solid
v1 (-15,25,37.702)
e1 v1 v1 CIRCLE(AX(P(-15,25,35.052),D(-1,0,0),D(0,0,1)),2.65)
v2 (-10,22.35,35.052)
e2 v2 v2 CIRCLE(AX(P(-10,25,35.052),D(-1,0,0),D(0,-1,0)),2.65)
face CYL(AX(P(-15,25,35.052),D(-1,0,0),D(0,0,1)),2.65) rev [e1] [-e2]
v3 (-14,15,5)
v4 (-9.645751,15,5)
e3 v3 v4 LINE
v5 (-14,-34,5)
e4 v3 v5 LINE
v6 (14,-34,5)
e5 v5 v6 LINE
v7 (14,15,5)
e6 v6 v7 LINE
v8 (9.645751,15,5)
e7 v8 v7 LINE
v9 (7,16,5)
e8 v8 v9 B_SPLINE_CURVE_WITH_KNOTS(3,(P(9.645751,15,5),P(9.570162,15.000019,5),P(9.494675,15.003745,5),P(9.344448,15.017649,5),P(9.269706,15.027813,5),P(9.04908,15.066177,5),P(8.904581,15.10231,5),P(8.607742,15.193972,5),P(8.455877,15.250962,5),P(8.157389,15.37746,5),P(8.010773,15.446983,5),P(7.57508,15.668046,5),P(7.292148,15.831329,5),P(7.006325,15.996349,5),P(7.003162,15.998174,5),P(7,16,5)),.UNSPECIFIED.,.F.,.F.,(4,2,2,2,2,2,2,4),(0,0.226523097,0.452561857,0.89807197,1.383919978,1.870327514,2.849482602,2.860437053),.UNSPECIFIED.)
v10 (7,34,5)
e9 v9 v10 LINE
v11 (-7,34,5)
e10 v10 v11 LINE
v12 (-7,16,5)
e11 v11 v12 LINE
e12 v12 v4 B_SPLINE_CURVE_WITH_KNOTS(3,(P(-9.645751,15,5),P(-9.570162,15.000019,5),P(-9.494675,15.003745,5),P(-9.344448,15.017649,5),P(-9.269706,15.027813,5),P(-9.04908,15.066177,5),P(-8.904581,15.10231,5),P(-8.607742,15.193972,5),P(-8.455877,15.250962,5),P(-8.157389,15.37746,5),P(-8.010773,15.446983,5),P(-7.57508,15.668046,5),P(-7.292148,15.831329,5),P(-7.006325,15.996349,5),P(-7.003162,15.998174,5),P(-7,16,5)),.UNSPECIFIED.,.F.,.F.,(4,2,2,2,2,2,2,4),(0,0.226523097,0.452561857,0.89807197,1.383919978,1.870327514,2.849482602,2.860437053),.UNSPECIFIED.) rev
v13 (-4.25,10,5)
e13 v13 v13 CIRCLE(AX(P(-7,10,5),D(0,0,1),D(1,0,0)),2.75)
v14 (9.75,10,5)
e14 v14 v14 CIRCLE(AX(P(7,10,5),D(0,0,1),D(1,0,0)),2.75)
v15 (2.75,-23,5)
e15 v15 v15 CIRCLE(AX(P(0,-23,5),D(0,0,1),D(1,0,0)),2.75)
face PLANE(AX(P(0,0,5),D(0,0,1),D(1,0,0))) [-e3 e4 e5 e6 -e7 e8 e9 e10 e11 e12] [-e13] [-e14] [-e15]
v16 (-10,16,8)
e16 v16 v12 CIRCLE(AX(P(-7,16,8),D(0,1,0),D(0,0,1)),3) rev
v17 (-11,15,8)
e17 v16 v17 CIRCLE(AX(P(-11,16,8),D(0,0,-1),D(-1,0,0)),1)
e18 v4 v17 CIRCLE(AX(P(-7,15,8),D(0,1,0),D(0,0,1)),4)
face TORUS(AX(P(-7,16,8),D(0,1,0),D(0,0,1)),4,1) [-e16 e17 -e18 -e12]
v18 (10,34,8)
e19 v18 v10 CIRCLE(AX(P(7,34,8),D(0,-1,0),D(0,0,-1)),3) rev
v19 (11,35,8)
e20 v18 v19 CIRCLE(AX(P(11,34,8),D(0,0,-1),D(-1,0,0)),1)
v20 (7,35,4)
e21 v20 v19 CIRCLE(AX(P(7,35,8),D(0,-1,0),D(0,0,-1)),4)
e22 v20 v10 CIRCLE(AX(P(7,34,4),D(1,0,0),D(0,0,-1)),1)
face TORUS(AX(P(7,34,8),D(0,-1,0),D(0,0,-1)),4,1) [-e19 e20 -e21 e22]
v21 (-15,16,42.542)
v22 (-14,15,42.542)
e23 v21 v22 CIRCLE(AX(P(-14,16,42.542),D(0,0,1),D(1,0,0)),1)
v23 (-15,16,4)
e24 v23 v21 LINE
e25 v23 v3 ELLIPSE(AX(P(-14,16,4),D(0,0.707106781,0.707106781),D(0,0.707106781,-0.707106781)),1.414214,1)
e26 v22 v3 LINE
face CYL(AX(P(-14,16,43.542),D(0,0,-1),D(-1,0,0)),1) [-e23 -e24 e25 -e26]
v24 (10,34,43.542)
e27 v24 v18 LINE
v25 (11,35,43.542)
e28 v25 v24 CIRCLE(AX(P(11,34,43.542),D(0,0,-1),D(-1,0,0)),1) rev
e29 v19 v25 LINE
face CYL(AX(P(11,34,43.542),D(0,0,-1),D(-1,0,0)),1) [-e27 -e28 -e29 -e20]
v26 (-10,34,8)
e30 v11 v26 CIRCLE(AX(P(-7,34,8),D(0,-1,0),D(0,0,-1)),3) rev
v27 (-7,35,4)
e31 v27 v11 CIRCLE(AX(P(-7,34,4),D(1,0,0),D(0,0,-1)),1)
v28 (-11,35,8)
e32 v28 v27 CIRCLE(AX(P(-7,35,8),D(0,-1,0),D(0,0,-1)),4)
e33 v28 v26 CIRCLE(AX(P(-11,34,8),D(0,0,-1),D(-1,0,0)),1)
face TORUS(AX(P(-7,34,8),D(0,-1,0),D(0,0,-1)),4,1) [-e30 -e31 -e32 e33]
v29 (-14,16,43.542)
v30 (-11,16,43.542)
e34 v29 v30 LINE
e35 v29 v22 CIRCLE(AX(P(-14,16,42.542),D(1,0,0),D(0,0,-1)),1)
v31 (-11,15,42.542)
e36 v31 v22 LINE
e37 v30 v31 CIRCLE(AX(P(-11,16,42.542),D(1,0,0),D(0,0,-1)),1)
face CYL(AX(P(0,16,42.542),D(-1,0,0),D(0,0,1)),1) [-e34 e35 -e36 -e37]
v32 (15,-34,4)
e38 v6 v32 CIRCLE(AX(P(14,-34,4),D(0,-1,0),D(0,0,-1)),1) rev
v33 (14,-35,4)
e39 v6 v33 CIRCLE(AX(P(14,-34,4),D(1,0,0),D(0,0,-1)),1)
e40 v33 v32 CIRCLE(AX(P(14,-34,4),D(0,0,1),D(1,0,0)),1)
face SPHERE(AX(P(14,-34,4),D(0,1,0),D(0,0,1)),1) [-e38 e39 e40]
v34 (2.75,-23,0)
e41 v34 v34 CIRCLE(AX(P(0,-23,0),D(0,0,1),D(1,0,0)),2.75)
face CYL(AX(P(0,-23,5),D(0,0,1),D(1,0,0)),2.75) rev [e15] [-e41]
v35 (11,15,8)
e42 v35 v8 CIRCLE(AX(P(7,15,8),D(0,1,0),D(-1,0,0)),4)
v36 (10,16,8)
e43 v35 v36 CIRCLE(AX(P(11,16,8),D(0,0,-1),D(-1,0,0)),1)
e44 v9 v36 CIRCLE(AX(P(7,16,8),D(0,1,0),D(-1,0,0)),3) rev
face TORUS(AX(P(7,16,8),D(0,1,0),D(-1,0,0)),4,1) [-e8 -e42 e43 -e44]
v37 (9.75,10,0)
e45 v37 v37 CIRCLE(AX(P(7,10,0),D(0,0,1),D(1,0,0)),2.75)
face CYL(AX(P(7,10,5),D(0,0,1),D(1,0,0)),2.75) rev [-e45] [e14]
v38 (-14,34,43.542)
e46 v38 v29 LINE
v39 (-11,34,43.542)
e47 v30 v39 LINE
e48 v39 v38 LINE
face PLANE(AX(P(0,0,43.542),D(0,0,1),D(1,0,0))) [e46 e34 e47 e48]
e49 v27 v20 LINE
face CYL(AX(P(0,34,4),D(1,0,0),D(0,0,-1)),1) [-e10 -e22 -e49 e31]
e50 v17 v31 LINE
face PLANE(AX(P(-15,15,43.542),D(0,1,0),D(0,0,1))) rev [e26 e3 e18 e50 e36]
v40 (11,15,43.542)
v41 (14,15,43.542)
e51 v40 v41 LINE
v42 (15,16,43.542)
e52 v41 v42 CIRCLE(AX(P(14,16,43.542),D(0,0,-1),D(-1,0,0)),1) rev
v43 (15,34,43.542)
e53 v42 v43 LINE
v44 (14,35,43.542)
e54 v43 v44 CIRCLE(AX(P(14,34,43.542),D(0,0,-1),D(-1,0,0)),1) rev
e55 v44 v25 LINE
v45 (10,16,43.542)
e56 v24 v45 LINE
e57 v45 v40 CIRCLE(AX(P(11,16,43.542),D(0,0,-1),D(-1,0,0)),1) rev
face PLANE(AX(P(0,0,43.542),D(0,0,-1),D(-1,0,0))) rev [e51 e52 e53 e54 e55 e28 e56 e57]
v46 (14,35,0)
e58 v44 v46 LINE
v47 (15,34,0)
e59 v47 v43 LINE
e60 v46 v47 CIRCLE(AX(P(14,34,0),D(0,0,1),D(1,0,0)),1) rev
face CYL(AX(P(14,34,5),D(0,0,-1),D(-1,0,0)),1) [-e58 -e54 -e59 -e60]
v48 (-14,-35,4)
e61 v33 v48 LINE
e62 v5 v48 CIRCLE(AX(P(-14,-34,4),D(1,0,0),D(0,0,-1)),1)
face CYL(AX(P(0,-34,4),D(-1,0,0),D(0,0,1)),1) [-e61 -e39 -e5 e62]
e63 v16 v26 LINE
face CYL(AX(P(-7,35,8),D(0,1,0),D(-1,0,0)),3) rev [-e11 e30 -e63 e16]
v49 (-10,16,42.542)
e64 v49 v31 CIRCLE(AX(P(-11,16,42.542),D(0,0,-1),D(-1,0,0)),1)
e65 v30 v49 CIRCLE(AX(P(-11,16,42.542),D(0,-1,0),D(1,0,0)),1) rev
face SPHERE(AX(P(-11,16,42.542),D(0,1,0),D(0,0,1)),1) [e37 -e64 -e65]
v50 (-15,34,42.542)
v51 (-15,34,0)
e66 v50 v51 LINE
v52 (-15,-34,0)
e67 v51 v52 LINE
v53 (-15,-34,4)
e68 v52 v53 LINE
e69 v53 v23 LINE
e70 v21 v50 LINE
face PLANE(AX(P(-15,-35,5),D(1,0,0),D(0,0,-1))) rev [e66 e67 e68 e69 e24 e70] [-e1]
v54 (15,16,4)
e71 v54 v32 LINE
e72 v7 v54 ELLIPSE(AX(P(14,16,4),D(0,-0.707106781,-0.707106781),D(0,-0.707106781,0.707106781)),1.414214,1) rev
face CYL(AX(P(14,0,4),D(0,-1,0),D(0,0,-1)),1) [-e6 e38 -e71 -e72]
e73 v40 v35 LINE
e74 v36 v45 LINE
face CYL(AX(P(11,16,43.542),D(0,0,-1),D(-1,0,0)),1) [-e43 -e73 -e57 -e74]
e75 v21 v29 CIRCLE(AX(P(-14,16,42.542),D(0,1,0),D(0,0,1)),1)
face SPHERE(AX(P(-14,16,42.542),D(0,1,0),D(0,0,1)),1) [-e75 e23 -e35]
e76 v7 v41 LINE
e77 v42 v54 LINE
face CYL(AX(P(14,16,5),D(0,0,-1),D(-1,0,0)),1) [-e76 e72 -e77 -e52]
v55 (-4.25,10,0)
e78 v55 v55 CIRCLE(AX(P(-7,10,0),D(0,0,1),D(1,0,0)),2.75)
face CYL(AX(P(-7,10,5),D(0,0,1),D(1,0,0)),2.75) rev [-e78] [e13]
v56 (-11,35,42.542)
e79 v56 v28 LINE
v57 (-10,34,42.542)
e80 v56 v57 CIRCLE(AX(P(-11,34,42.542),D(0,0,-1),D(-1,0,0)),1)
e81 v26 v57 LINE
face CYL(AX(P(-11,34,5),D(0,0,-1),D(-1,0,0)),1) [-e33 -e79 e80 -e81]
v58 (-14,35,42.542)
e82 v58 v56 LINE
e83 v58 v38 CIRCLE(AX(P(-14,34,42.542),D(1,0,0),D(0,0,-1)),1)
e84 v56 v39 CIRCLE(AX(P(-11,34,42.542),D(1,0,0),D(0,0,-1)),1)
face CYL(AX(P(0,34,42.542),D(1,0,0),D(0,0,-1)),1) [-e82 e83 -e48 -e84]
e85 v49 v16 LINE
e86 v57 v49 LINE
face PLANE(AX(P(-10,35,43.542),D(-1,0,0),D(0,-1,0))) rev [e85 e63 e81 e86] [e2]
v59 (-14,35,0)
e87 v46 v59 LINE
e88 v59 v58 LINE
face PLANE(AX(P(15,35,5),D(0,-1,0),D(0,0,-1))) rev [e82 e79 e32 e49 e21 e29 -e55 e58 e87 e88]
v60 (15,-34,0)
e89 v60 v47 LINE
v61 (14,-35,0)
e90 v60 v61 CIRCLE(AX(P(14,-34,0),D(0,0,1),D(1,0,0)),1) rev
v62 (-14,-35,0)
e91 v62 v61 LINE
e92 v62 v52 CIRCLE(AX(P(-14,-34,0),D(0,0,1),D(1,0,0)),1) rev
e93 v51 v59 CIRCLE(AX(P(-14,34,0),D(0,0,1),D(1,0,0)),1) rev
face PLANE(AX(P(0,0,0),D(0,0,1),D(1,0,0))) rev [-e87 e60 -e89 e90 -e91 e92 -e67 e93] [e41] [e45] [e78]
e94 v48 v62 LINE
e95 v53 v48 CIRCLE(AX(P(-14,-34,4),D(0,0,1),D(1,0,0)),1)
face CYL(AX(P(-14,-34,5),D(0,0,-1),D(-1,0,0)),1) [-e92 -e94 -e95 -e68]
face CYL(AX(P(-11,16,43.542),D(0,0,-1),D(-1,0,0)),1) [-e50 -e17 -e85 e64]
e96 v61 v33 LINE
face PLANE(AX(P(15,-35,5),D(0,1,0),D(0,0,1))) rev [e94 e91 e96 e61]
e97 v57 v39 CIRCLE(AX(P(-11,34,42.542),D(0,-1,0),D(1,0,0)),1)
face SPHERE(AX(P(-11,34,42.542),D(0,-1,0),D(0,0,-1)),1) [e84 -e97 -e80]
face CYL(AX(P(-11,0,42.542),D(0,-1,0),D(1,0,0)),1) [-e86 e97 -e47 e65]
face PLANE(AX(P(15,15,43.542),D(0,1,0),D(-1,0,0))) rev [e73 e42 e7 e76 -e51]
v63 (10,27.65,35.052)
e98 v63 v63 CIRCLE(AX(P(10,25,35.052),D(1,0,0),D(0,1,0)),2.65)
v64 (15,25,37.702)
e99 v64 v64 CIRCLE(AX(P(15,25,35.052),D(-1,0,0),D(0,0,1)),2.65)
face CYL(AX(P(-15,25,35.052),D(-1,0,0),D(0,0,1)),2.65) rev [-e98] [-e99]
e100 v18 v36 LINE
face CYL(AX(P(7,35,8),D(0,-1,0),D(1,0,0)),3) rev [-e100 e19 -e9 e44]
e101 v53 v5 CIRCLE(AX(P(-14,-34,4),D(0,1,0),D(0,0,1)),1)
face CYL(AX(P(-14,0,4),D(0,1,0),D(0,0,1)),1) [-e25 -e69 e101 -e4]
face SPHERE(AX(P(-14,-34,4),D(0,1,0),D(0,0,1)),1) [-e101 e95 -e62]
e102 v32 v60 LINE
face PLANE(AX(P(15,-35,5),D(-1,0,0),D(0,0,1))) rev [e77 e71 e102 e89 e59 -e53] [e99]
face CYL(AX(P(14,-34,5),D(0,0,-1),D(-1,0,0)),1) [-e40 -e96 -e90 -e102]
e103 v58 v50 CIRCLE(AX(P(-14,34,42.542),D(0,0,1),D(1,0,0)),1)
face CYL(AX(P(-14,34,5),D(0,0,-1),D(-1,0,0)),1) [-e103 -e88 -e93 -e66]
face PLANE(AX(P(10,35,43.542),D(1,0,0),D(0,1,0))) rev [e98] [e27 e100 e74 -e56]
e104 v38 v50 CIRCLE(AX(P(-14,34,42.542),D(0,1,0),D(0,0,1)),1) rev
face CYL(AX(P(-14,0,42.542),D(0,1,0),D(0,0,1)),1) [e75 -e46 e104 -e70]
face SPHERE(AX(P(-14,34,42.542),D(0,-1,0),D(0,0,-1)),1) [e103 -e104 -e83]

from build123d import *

# Parameters (mm, degrees)
SKETCH1_W            = 30
SKETCH1_H            = 70
BOSS_EXTRUDE1_DEPTH  = 5
M5_CLEARANCE_HOLE1_D = 5.5
SKETCH4_W            = 5
SKETCH4_H            = 20
BOSS_EXTRUDE2_DEPTH  = 38.541999878
M5_CLEARANCE_HOLE2_D = 5.3
FILLET1_R            = 3
FILLET2_R            = 1
FILLET3_R            = 1
FILLET4_R            = 1
FILLET5_R            = 1
FILLET6_R            = 1


with BuildPart() as part:
    # Sketch1 → Boss-Extrude1 (new body)
    with BuildSketch(Plane.XY):
        Rectangle(SKETCH1_W, SKETCH1_H)
    extrude(amount=BOSS_EXTRUDE1_DEPTH)

    # M5 Clearance Hole1 (through all)
    with Locations(Plane.XY.offset(5)):
        with Locations((0, -23), (-7, 10), (7, 10)):
            Hole(M5_CLEARANCE_HOLE1_D / 2)

    # Sketch4 → Boss-Extrude2 (add)
    with BuildSketch(Plane.XY.offset(5)):
        with Locations((-12.5, 25)):
            Rectangle(SKETCH4_W, SKETCH4_H)
        with Locations((12.5, 25)):
            Rectangle(SKETCH4_W, SKETCH4_H)
    extrude(amount=BOSS_EXTRUDE2_DEPTH)

    # M5 Clearance Hole2 (through all)
    with Locations(Plane.ZY.offset(15)):
        with Locations((35.052, 25)):
            Hole(M5_CLEARANCE_HOLE2_D / 2)

    # Fillet1
    fillet1_edges = [part.edges().sort_by_distance(p)[0] for p in [
        (-10, 25, 5),
        (10, 25, 5),
    ]]
    fillet(fillet1_edges, radius=FILLET1_R)

    # Fillet2
    fillet2_edges = [part.edges().sort_by_distance(p)[0] for p in [
        (-15, 25, 43.541999878),
        (-10, 25, 43.541999878),
    ]]
    fillet(fillet2_edges, radius=FILLET2_R)

    # Fillet3
    # the kernel refuses this fillet: 1 mm, written as the material it takes off along each edge
    with BuildSketch(Plane(origin=(7, 15, 8), x_dir=(-0.7404019062872322, 0, -0.6721644271800112), z_dir=(-0.6721644271800112, 0, 0.7404019062872322))) as fillet3_piece_1_section:
        with BuildLine():
            CenterArc((3 + FILLET3_R, -FILLET3_R), FILLET3_R, 90, 90)
            Line((3 + FILLET3_R, 0), (3, 0))
            Line((3, 0), (3, -FILLET3_R))
        make_face()
    fillet3_piece_1 = revolve(axis=Axis((7, 15, 8), (0, -1, 0)), revolution_arc=137.765663079, mode=Mode.PRIVATE)
    fillet3_piece_1 = split(fillet3_piece_1, bisect_by=Plane(origin=(9.145909212, 15.257974559, 5), z_dir=(0, 0, 1)), keep=Keep.TOP, mode=Mode.PRIVATE)
    add(fillet3_piece_1, mode=Mode.SUBTRACT)
    with BuildSketch(Plane(origin=(-7, 15, 8), x_dir=(0.7404019062872333, 0, -0.6721644271800099), z_dir=(0.6721644271800099, 0, 0.7404019062872333))) as fillet3_piece_2_section:
        with BuildLine():
            CenterArc((3 + FILLET3_R, FILLET3_R), FILLET3_R, 180, 90)
            Line((3 + FILLET3_R, 0), (3, 0))
            Line((3, 0), (3, FILLET3_R))
        make_face()
    fillet3_piece_2 = revolve(axis=Axis((-7, 15, 8), (0, 1, 0)), revolution_arc=137.765663079, mode=Mode.PRIVATE)
    fillet3_piece_2 = split(fillet3_piece_2, bisect_by=Plane(origin=(-9.145909903, 15.257974038, 5), z_dir=(0, 0, 1)), keep=Keep.TOP, mode=Mode.PRIVATE)
    add(fillet3_piece_2, mode=Mode.SUBTRACT)
    with BuildSketch(Plane(origin=(-10, 15, 8), x_dir=(0, 1, 0), z_dir=(0, 0, 1))) as fillet3_piece_3:
        with BuildLine():
            CenterArc((FILLET3_R, FILLET3_R), FILLET3_R, 180, 90)
            Line((0, FILLET3_R), (0, 0))
            Line((0, 0), (FILLET3_R, 0))
        make_face()
    extrude(amount=34.541999878, mode=Mode.SUBTRACT)
    with BuildSketch(Plane(origin=(-11, 15, 42.541999878), x_dir=(1, 0, 0), z_dir=(0, 0, -1))) as fillet3_piece_4:
        with BuildLine():
            CenterArc((1 - FILLET3_R, -FILLET3_R), FILLET3_R, 0, 90)
            Line((1 - FILLET3_R, 0), (1, 0))
            Line((1, 0), (1, -FILLET3_R))
        make_face()
    revolve(axis=Axis((-11, 15, 42.541999878), (0, -1, 0)), revolution_arc=90, mode=Mode.SUBTRACT)
    with BuildSketch(Plane(origin=(-11, 15, 43.541999878), x_dir=(0, 0, -1), z_dir=(-1, 0, 0)), Plane(origin=(-14, 35, 43.541999878), x_dir=(0, 0, -1), z_dir=(1, 0, 0))) as fillet3_piece_5:
        with BuildLine():
            CenterArc((FILLET3_R, -FILLET3_R), FILLET3_R, 90, 90)
            Line((0, -FILLET3_R), (0, 0))
            Line((0, 0), (FILLET3_R, 0))
        make_face()
    extrude(amount=3, mode=Mode.SUBTRACT)
    with BuildSketch(Plane(origin=(-14, 15, 42.541999878), x_dir=(0, 0, 1), z_dir=(1, 0, 0))) as fillet3_piece_6:
        with BuildLine():
            CenterArc((1 - FILLET3_R, -FILLET3_R), FILLET3_R, 0, 90)
            Line((1, -FILLET3_R), (1, 0))
            Line((1, 0), (1 - FILLET3_R, 0))
        make_face()
    revolve(axis=Axis((-14, 15, 42.541999878), (0, -1, 0)), revolution_arc=90, mode=Mode.SUBTRACT)
    with BuildSketch(Plane(origin=(7, 35, 8), x_dir=(0, 0, -1), z_dir=(-1, 0, 0))) as fillet3_piece_7:
        with BuildLine():
            CenterArc((3 + FILLET3_R, FILLET3_R), FILLET3_R, 180, 90)
            Line((3, FILLET3_R), (3, 0))
            Line((3, 0), (3 + FILLET3_R, 0))
        make_face()
    revolve(axis=Axis((7, 35, 8), (0, -1, 0)), revolution_arc=90, mode=Mode.SUBTRACT)
    with BuildSketch(Plane(origin=(-7, 35, 5), x_dir=(0, 0, -1), z_dir=(1, 0, 0))) as fillet3_piece_8:
        with BuildLine():
            CenterArc((FILLET3_R, -FILLET3_R), FILLET3_R, 90, 90)
            Line((0, -FILLET3_R), (0, 0))
            Line((0, 0), (FILLET3_R, 0))
        make_face()
    extrude(amount=14, mode=Mode.SUBTRACT)
    with BuildSketch(Plane(origin=(-7, 35, 8), x_dir=(0, 0, -1), z_dir=(1, 0, 0))) as fillet3_piece_9:
        with BuildLine():
            CenterArc((3 + FILLET3_R, -FILLET3_R), FILLET3_R, 90, 90)
            Line((3, -FILLET3_R), (3, 0))
            Line((3, 0), (3 + FILLET3_R, 0))
        make_face()
    revolve(axis=Axis((-7, 35, 8), (0, 1, 0)), revolution_arc=90, mode=Mode.SUBTRACT)
    with BuildSketch(Plane(origin=(-10, 35, 8), x_dir=(0, -1, 0), z_dir=(0, 0, 1))) as fillet3_piece_10:
        with BuildLine():
            CenterArc((FILLET3_R, -FILLET3_R), FILLET3_R, 90, 90)
            Line((0, -FILLET3_R), (0, 0))
            Line((0, 0), (FILLET3_R, 0))
        make_face()
    extrude(amount=34.541999878, mode=Mode.SUBTRACT)
    with BuildSketch(Plane(origin=(-11, 35, 42.541999878), x_dir=(1, 0, 0), z_dir=(0, 0, -1))) as fillet3_piece_11:
        with BuildLine():
            CenterArc((1 - FILLET3_R, FILLET3_R), FILLET3_R, 270, 90)
            Line((1, FILLET3_R), (1, 0))
            Line((1, 0), (1 - FILLET3_R, 0))
        make_face()
    revolve(axis=Axis((-11, 35, 42.541999878), (0, -1, 0)), revolution_arc=90, mode=Mode.SUBTRACT)
    with BuildSketch(Plane(origin=(-14, 35, 42.541999878), x_dir=(0, 0, 1), z_dir=(1, 0, 0))) as fillet3_piece_12:
        with BuildLine():
            CenterArc((1 - FILLET3_R, FILLET3_R), FILLET3_R, 270, 90)
            Line((1, FILLET3_R), (1, 0))
            Line((1, 0), (1 - FILLET3_R, 0))
        make_face()
    revolve(axis=Axis((-14, 35, 42.541999878), (0, -1, 0)), revolution_arc=90, mode=Mode.SUBTRACT)
    with BuildSketch(Plane(origin=(10, 35, 8), x_dir=(1, 0, 0), z_dir=(0, 0, 1)), Plane(origin=(10, 15, 8), x_dir=(0, 1, 0), z_dir=(0, 0, 1))) as fillet3_piece_13:
        with BuildLine():
            CenterArc((FILLET3_R, -FILLET3_R), FILLET3_R, 90, 90)
            Line((0, -FILLET3_R), (0, 0))
            Line((0, 0), (FILLET3_R, 0))
        make_face()
    extrude(amount=38.041999878, mode=Mode.SUBTRACT)
    with BuildSketch(Plane(origin=(-15, 15, 5), x_dir=(1, 0, 0), z_dir=(0, 0, 1))) as fillet3_piece_14:
        with BuildLine():
            CenterArc((FILLET3_R, FILLET3_R), FILLET3_R, 180, 90)
            Line((0, FILLET3_R), (0, 0))
            Line((0, 0), (FILLET3_R, 0))
        make_face()
    extrude(amount=37.541999878, mode=Mode.SUBTRACT)
    with BuildSketch(Plane(origin=(-15, 35, 42.541999878), x_dir=(1, 0, 0), z_dir=(0, 0, -1))) as fillet3_piece_15:
        with BuildLine():
            CenterArc((FILLET3_R, FILLET3_R), FILLET3_R, 180, 90)
            Line((0, FILLET3_R), (0, 0))
            Line((0, 0), (FILLET3_R, 0))
        make_face()
    extrude(amount=45.041999878, mode=Mode.SUBTRACT)

    # Fillet4
    fillet4_edges = [part.edges().sort_by_distance(p)[0] for p in [
        (15, 15, 24.270999939),
        (15, 35, 21.770999939),
    ]]
    fillet(fillet4_edges, radius=FILLET4_R)

    # Fillet5
    fillet5_edges = [part.edges().sort_by_distance(p)[0] for p in [
        (-15, -9.5, 5),
        (15, -9.5, 5),
    ]]
    fillet(fillet5_edges, radius=FILLET5_R)

    # Fillet6
    fillet6_edges = [part.edges().sort_by_distance(p)[0] for p in [
        (0, -35, 5),
        (15, -35, 2),
        (-15, -35, 2),
        (14.707106781, -35, 4.707106781),
        (-14.707106781, -35, 4.707106781),
    ]]
    fillet(fillet6_edges, radius=FILLET6_R)


solid = part.part
